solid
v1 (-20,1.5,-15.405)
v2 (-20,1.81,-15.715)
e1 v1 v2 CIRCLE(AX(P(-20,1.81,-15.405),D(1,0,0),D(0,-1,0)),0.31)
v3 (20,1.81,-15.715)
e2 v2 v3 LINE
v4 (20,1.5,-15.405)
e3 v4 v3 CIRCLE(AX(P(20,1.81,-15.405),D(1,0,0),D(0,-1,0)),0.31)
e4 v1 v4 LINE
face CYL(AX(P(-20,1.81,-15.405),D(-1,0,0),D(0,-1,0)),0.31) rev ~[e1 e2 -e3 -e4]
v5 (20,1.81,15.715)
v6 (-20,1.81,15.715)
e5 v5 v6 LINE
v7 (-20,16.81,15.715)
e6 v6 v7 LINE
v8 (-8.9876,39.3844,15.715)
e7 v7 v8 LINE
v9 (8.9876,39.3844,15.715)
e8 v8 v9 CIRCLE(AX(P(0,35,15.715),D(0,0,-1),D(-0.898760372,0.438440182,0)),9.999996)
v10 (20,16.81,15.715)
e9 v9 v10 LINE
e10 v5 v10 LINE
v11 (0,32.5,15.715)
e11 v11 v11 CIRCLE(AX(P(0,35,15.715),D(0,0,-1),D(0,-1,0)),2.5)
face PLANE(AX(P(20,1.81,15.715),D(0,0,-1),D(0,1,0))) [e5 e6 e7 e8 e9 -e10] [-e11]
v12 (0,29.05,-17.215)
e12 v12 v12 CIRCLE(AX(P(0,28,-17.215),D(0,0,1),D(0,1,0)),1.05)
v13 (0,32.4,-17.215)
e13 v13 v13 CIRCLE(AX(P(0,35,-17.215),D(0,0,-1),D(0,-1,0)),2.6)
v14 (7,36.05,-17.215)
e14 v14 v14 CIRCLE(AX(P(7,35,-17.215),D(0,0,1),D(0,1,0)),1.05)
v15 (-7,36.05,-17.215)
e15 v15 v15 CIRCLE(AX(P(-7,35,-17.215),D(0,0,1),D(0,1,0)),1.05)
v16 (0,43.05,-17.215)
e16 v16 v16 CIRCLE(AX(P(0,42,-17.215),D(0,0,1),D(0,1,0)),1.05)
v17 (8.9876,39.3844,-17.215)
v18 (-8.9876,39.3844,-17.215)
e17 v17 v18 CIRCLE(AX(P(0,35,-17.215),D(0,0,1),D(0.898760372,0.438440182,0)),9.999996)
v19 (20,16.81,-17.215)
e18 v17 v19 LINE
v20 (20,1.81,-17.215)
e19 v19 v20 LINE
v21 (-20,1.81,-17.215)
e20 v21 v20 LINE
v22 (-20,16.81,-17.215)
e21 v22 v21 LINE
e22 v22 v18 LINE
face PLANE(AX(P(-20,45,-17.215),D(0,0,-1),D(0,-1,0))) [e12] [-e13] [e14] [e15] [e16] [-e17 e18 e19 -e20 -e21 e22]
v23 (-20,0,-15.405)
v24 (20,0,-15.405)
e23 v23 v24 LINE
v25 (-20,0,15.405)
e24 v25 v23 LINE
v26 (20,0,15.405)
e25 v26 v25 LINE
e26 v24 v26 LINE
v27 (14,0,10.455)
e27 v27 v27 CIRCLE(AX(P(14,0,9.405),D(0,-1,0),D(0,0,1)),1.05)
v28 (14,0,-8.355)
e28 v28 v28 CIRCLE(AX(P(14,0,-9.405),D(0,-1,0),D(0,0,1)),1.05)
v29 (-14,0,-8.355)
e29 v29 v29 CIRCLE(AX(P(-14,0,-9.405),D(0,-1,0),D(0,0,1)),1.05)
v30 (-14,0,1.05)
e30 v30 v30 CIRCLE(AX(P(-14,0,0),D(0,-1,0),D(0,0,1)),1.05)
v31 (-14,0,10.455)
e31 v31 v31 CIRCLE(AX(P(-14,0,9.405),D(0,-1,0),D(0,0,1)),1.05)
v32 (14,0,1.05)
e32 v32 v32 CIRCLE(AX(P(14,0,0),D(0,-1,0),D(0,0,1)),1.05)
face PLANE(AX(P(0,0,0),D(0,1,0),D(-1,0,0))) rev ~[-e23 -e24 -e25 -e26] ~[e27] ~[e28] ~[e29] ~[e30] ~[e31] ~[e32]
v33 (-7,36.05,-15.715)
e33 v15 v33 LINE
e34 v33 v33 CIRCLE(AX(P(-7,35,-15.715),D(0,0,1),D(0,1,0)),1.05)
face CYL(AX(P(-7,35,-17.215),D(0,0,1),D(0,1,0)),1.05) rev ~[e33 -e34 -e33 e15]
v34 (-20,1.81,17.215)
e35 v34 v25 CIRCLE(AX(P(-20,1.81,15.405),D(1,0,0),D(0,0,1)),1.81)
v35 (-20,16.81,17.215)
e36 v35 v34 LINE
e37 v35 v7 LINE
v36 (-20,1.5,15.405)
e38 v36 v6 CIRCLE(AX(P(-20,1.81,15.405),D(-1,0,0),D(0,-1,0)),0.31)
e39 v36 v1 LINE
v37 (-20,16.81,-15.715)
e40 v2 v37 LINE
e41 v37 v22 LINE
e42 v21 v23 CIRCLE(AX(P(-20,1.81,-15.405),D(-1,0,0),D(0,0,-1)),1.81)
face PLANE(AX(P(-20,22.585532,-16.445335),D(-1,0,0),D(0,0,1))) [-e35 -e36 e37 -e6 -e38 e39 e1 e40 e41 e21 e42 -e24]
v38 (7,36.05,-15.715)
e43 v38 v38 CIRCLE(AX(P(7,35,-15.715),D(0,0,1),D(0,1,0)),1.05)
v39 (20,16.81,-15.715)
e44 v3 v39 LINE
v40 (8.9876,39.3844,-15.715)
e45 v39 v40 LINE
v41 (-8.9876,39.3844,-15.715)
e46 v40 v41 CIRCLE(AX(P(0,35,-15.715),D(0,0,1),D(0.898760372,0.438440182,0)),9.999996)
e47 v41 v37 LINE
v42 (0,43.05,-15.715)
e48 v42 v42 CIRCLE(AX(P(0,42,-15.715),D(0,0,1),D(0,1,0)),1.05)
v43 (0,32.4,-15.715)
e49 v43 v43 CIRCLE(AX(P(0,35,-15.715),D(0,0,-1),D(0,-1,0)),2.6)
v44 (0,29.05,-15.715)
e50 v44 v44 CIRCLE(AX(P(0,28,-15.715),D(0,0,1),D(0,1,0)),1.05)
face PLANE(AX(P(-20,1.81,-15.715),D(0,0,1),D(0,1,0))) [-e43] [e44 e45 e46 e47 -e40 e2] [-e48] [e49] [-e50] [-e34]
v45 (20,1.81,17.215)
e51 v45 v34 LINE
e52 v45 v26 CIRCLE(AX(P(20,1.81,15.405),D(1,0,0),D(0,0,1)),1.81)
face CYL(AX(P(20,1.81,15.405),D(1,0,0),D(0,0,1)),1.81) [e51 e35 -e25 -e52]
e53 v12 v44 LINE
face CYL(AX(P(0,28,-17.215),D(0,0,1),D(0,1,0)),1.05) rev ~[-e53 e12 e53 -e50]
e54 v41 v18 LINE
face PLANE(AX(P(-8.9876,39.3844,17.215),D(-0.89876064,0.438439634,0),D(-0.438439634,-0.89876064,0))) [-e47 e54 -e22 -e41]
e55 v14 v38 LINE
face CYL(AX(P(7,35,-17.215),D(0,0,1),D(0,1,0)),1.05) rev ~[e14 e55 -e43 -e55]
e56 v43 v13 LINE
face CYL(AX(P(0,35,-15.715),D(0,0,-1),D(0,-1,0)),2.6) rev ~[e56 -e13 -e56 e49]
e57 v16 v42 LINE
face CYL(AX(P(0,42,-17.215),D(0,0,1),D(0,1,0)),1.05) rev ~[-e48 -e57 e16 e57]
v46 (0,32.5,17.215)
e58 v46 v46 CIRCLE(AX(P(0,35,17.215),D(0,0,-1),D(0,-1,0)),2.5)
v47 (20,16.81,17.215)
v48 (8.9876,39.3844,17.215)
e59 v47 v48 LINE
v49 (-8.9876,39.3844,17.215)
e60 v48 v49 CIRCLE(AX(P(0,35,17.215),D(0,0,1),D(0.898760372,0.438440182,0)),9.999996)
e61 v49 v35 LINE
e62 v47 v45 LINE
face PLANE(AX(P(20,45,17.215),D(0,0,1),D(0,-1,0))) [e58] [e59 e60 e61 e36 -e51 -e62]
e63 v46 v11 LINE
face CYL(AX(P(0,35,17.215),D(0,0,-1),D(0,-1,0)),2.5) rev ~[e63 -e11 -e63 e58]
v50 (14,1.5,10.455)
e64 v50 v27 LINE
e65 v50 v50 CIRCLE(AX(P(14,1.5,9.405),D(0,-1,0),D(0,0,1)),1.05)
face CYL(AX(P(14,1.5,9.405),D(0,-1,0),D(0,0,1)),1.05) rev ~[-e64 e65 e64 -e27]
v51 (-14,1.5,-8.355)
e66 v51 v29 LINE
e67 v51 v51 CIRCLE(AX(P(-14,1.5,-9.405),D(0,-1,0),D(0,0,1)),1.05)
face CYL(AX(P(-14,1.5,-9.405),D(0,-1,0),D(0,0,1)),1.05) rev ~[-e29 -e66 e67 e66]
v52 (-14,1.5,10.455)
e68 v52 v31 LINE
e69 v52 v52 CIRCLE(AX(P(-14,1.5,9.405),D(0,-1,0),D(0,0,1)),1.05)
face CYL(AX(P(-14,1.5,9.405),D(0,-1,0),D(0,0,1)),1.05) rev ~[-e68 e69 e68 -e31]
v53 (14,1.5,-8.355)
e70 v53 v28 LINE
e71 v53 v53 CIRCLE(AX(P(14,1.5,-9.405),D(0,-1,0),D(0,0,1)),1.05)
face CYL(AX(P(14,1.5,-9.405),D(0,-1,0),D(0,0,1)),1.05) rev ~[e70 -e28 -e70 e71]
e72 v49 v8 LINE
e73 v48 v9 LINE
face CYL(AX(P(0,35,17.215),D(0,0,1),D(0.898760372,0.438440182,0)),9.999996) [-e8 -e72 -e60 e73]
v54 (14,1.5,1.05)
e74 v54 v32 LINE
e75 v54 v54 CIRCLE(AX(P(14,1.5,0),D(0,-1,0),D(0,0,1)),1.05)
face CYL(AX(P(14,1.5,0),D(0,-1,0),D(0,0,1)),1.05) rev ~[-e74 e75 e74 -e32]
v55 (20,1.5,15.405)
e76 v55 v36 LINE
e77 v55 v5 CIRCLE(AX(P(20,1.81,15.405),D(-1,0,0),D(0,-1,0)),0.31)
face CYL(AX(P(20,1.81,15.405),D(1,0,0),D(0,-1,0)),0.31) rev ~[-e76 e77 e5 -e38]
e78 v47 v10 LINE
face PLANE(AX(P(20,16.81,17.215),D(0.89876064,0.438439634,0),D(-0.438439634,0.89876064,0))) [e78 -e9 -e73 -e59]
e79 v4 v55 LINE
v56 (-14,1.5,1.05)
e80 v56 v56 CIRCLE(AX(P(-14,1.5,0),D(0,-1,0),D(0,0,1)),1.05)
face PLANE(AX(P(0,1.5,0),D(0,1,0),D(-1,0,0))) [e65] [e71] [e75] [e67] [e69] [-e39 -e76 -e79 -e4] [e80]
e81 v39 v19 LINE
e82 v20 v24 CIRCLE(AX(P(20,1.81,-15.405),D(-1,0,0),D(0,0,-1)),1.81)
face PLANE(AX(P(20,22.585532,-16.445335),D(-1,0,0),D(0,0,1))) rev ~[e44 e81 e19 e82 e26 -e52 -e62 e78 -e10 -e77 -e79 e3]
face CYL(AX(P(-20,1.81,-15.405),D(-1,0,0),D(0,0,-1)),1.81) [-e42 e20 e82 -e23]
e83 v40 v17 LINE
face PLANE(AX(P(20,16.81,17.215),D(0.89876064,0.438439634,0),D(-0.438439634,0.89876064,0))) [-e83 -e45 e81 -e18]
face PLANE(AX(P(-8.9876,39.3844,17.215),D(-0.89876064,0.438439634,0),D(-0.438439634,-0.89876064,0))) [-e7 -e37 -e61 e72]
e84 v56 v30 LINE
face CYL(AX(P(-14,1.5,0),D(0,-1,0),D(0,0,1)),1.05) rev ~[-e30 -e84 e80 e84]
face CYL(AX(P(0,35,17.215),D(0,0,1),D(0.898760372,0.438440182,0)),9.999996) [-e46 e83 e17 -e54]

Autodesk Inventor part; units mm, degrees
ref_plane "YZ Plane" through (0, 0, 0) normal (1, 0, 0) x (0, 1, 0)
ref_plane "XZ Plane" through (0, 0, 0) normal (0, 1, 0) x (-1, 0, 0)
ref_plane "XY Plane" through (0, 0, 0) normal (0, 0, 1) x (1, 0, 0)
sketch "Sketch1" plane through (0, 0, 0) normal (0, 1, 0) x (-1, 0, 0)
  line L0 (20, -15.715) -> (-20, -15.715)
  line L1 (-20, -15.715) -> (-20, 15.715)
  line L2 (-20, 15.715) -> (20, 15.715)
  line L3 (20, 15.715) -> (20, -15.715)
  point P0 (0, 0)
  dimension "d0" = 40
  dimension "d1" = 20
  dimension "d2" = 31.43
  dimension "d3" = 15.715
extrude "Plate1" add sketch "Sketch1" along normal blind 1.5
sketch "Sketch2" plane through (20, 0, 17.215) normal (0, 0, -1) x (-1, 0, 0)
  line L0 (40, 0) -> (0, 0)
  line L1 (0, 0) -> (0, 45)
  line L2 (0, 45) -> (40, 45)
  line L3 (40, 45) -> (40, 0)
edge flange "Flange1" height 45 angle 90 thickness 1.5 bend radius 0.31 thickness toward (0, 0, -1) relief tear relief width 1.5 relief depth 0.75 edges at (0, 1.5, 15.715) wall of the first edge with corners at (-20, 0, 17.215) (20, 0, 17.215) (20, 45, 17.215) (-20, 45, 17.215)
bend "Bend1"
corner "Corner1"
sketch "Sketch3" plane through (-20, 0, -17.215) normal (0, 0, 1) x (1, 0, 0)
  line L0 (40, 0) -> (0, 0)
  line L1 (0, 0) -> (0, 45)
  line L2 (0, 45) -> (40, 45)
  line L3 (40, 45) -> (40, 0)
edge flange "Flange2" height 45 angle 90 thickness 1.5 bend radius 0.31 thickness toward (0, 0, 1) relief tear relief width 1.5 relief depth 0.75 edges at (0, 1.5, -15.715) wall of the first edge with corners at (20, 0, -17.215) (-20, 0, -17.215) (-20, 45, -17.215) (20, 45, -17.215)
bend "Bend2"
corner "Corner2"
sketch "Sketch4" plane through (-20, 45, 17.215) normal (0, 0, 1) x (1, 0, 0)
  line L0 (0, -43.19) -> (0, 0) projected
  line L1 (0, 0) -> (40, 0) projected
  line L2 (40, 0) -> (40, -43.19) projected
  line L3 (0, -43.19) -> (40, -43.19) projected
  arc A0 (28.9876, -5.6156) -> (11.0124, -5.6156) centre (20, -10) ccw
  line L4 (0, -38.19) -> (40, -38.19)
  line L5 (40, -38.19) -> (40, -28.19)
  line L6 (40, -28.19) -> (0, -28.19)
  line L7 (0, -28.19) -> (0, -38.19)
  line L8 (40, -28.19) -> (28.9876, -5.6156)
  line L9 (11.0124, -5.6156) -> (0, -28.19)
  point P0 (0, -28.19)
  point P1 (20, 0)
  point P2 (40, -28.19)
  dimension "d50" = 10
  dimension "d51" = 20
  dimension "d52" = 20
  dimension "d53" = 38.19
  dimension "d54" = 10
  dimension "d55" = 40
  dimension "d56" = 40
extrude "Extrusion1" cut sketch "Sketch4" against normal blind 50 contours L0 L1 A0 L9 | L8 A0 L1 L2
sketch "Sketch6" plane through (-20, 1.81, 17.215) normal (0, 0, 1) x (1, 0, 0)
  arc A0 (28.9876, 37.5744) -> (11.0124, 37.5744) centre (20, 33.19) ccw projected
  point P0 (20, -1.81)
hole "Hole2" at (0, 35, 17.215) direction (0, 0, -1) diameter 5 depth 1.5 clearance for "Hex Head Bolt" size "M5" standard "Ansi Metric M Profile"
sketch "Sketch7" plane through (-20, 1.81, -15.715) normal (0, 0, 1) x (1, 0, 0)
  arc A0 (28.9876, 37.5744) -> (11.0124, 37.5744) centre (20, 33.19) ccw projected
  point P0 (20, -1.81)
hole "Hole3" at (0, 35, -15.715) direction (0, 0, -1) diameter 5.2 depth 1.5 clearance for "Hex Head Bolt" size "M5" standard "Ansi Metric M Profile"
sketch "Sketch8" plane through (0, 1.5, 0) normal (0, 1, 0) x (1, 0, 0)
  line L0 (20, 15.405) -> (20, -15.405) projected
  line L1 (20, -15.715) -> (-20, -15.715) projected
  line L2 (-20, -15.405) -> (20, -15.405) projected
  line L3 (20, 15.405) -> (-20, 15.405) projected
  point P0 (0, 0)
  point P1 (14, -9.405)
  point P2 (-14, -9.405)
  point P3 (14, 0)
  point P4 (-14, 0)
  point P5 (14, 9.405)
  point P6 (-14, 9.405)
  dimension "d71" = 6
  dimension "d73" = 6
  dimension "d76" = 28
  dimension "d79" = 9.405
hole "Hole4" at (14, 1.5, 9.405) at (-14, 1.5, 9.405) at (14, 1.5, 0) at (-14, 1.5, 0) at (14, 1.5, -9.405) at (-14, 1.5, -9.405) direction (0, -1, 0) diameter 2.1 depth 1.5
sketch "Sketch9" plane through (20, 1.81, -17.215) normal (0, 0, -1) x (-1, 0, 0)
  arc A0 (28.9876, 37.5744) -> (11.0124, 37.5744) centre (20, 33.19) ccw projected
  circle A1 centre (20, 40.19) radius 1.05
  circle A2 centre (13, 33.19) radius 1.05
  circle A3 centre (20, 26.19) radius 1.05
  circle A4 centre (27, 33.19) radius 1.05
  point P0 (20, -1.81)
  dimension "d89" = 7
  dimension "d90" = 0
  dimension "d91" = 2.1
  dimension "d94" = 360
hole "Hole5" at (0, 28, -17.215) at (7, 35, -17.215) at (-7, 35, -17.215) at (0, 42, -17.215) direction (0, 0, 1) diameter 2.1 depth 1.5
equation "\"d62\" = Thickness"
equation "\"d69\" = Thickness"
equation "\"d87\" = Thickness"
equation "\"d101\" = Thickness"
equation "\"d4\" = Thickness"
equation "\"d5\" = BendReliefWidth"
equation "\"d6\" = BendReliefDepth"
equation "\"d7\" = MinimumRemnant"
equation "\"d8\" = TransitionRadius"
equation "\"d11\" = BendRadius"
equation "\"d12\" = CornerReliefSize"
equation "\"d13\" = GapSize"
equation "\"d14\" = JacobiRadiusSize"
equation "\"d15\" = BendReliefWidth"
equation "\"d16\" = BendReliefDepth"
equation "\"d17\" = MinimumRemnant"
equation "\"d18\" = TransitionRadius"
equation "\"d21\" = BendRadius"
equation "\"d22\" = CornerReliefSize"
equation "\"d23\" = GapSize"
equation "\"d24\" = JacobiRadiusSize"
equation "\"BendReliefWidth\" = Thickness"
equation "\"BendReliefDepth\" = 0.5 * Thickness"
equation "\"CornerReliefSize\" = 4 * Thickness"
equation "\"MinimumRemnant\" = 2 * Thickness"
equation "\"TransitionRadius\" = BendRadius"
equation "\"JacobiRadiusSize\" = BendRadius"
equation "\"GapSize\" = Thickness"
equation "\"Thickness\" = 1.5"
equation "\"BendRadius\" = 0.31"
properties part number "axis_12_bottom_frame(top)" material "Aluminum 6061-AHC"
